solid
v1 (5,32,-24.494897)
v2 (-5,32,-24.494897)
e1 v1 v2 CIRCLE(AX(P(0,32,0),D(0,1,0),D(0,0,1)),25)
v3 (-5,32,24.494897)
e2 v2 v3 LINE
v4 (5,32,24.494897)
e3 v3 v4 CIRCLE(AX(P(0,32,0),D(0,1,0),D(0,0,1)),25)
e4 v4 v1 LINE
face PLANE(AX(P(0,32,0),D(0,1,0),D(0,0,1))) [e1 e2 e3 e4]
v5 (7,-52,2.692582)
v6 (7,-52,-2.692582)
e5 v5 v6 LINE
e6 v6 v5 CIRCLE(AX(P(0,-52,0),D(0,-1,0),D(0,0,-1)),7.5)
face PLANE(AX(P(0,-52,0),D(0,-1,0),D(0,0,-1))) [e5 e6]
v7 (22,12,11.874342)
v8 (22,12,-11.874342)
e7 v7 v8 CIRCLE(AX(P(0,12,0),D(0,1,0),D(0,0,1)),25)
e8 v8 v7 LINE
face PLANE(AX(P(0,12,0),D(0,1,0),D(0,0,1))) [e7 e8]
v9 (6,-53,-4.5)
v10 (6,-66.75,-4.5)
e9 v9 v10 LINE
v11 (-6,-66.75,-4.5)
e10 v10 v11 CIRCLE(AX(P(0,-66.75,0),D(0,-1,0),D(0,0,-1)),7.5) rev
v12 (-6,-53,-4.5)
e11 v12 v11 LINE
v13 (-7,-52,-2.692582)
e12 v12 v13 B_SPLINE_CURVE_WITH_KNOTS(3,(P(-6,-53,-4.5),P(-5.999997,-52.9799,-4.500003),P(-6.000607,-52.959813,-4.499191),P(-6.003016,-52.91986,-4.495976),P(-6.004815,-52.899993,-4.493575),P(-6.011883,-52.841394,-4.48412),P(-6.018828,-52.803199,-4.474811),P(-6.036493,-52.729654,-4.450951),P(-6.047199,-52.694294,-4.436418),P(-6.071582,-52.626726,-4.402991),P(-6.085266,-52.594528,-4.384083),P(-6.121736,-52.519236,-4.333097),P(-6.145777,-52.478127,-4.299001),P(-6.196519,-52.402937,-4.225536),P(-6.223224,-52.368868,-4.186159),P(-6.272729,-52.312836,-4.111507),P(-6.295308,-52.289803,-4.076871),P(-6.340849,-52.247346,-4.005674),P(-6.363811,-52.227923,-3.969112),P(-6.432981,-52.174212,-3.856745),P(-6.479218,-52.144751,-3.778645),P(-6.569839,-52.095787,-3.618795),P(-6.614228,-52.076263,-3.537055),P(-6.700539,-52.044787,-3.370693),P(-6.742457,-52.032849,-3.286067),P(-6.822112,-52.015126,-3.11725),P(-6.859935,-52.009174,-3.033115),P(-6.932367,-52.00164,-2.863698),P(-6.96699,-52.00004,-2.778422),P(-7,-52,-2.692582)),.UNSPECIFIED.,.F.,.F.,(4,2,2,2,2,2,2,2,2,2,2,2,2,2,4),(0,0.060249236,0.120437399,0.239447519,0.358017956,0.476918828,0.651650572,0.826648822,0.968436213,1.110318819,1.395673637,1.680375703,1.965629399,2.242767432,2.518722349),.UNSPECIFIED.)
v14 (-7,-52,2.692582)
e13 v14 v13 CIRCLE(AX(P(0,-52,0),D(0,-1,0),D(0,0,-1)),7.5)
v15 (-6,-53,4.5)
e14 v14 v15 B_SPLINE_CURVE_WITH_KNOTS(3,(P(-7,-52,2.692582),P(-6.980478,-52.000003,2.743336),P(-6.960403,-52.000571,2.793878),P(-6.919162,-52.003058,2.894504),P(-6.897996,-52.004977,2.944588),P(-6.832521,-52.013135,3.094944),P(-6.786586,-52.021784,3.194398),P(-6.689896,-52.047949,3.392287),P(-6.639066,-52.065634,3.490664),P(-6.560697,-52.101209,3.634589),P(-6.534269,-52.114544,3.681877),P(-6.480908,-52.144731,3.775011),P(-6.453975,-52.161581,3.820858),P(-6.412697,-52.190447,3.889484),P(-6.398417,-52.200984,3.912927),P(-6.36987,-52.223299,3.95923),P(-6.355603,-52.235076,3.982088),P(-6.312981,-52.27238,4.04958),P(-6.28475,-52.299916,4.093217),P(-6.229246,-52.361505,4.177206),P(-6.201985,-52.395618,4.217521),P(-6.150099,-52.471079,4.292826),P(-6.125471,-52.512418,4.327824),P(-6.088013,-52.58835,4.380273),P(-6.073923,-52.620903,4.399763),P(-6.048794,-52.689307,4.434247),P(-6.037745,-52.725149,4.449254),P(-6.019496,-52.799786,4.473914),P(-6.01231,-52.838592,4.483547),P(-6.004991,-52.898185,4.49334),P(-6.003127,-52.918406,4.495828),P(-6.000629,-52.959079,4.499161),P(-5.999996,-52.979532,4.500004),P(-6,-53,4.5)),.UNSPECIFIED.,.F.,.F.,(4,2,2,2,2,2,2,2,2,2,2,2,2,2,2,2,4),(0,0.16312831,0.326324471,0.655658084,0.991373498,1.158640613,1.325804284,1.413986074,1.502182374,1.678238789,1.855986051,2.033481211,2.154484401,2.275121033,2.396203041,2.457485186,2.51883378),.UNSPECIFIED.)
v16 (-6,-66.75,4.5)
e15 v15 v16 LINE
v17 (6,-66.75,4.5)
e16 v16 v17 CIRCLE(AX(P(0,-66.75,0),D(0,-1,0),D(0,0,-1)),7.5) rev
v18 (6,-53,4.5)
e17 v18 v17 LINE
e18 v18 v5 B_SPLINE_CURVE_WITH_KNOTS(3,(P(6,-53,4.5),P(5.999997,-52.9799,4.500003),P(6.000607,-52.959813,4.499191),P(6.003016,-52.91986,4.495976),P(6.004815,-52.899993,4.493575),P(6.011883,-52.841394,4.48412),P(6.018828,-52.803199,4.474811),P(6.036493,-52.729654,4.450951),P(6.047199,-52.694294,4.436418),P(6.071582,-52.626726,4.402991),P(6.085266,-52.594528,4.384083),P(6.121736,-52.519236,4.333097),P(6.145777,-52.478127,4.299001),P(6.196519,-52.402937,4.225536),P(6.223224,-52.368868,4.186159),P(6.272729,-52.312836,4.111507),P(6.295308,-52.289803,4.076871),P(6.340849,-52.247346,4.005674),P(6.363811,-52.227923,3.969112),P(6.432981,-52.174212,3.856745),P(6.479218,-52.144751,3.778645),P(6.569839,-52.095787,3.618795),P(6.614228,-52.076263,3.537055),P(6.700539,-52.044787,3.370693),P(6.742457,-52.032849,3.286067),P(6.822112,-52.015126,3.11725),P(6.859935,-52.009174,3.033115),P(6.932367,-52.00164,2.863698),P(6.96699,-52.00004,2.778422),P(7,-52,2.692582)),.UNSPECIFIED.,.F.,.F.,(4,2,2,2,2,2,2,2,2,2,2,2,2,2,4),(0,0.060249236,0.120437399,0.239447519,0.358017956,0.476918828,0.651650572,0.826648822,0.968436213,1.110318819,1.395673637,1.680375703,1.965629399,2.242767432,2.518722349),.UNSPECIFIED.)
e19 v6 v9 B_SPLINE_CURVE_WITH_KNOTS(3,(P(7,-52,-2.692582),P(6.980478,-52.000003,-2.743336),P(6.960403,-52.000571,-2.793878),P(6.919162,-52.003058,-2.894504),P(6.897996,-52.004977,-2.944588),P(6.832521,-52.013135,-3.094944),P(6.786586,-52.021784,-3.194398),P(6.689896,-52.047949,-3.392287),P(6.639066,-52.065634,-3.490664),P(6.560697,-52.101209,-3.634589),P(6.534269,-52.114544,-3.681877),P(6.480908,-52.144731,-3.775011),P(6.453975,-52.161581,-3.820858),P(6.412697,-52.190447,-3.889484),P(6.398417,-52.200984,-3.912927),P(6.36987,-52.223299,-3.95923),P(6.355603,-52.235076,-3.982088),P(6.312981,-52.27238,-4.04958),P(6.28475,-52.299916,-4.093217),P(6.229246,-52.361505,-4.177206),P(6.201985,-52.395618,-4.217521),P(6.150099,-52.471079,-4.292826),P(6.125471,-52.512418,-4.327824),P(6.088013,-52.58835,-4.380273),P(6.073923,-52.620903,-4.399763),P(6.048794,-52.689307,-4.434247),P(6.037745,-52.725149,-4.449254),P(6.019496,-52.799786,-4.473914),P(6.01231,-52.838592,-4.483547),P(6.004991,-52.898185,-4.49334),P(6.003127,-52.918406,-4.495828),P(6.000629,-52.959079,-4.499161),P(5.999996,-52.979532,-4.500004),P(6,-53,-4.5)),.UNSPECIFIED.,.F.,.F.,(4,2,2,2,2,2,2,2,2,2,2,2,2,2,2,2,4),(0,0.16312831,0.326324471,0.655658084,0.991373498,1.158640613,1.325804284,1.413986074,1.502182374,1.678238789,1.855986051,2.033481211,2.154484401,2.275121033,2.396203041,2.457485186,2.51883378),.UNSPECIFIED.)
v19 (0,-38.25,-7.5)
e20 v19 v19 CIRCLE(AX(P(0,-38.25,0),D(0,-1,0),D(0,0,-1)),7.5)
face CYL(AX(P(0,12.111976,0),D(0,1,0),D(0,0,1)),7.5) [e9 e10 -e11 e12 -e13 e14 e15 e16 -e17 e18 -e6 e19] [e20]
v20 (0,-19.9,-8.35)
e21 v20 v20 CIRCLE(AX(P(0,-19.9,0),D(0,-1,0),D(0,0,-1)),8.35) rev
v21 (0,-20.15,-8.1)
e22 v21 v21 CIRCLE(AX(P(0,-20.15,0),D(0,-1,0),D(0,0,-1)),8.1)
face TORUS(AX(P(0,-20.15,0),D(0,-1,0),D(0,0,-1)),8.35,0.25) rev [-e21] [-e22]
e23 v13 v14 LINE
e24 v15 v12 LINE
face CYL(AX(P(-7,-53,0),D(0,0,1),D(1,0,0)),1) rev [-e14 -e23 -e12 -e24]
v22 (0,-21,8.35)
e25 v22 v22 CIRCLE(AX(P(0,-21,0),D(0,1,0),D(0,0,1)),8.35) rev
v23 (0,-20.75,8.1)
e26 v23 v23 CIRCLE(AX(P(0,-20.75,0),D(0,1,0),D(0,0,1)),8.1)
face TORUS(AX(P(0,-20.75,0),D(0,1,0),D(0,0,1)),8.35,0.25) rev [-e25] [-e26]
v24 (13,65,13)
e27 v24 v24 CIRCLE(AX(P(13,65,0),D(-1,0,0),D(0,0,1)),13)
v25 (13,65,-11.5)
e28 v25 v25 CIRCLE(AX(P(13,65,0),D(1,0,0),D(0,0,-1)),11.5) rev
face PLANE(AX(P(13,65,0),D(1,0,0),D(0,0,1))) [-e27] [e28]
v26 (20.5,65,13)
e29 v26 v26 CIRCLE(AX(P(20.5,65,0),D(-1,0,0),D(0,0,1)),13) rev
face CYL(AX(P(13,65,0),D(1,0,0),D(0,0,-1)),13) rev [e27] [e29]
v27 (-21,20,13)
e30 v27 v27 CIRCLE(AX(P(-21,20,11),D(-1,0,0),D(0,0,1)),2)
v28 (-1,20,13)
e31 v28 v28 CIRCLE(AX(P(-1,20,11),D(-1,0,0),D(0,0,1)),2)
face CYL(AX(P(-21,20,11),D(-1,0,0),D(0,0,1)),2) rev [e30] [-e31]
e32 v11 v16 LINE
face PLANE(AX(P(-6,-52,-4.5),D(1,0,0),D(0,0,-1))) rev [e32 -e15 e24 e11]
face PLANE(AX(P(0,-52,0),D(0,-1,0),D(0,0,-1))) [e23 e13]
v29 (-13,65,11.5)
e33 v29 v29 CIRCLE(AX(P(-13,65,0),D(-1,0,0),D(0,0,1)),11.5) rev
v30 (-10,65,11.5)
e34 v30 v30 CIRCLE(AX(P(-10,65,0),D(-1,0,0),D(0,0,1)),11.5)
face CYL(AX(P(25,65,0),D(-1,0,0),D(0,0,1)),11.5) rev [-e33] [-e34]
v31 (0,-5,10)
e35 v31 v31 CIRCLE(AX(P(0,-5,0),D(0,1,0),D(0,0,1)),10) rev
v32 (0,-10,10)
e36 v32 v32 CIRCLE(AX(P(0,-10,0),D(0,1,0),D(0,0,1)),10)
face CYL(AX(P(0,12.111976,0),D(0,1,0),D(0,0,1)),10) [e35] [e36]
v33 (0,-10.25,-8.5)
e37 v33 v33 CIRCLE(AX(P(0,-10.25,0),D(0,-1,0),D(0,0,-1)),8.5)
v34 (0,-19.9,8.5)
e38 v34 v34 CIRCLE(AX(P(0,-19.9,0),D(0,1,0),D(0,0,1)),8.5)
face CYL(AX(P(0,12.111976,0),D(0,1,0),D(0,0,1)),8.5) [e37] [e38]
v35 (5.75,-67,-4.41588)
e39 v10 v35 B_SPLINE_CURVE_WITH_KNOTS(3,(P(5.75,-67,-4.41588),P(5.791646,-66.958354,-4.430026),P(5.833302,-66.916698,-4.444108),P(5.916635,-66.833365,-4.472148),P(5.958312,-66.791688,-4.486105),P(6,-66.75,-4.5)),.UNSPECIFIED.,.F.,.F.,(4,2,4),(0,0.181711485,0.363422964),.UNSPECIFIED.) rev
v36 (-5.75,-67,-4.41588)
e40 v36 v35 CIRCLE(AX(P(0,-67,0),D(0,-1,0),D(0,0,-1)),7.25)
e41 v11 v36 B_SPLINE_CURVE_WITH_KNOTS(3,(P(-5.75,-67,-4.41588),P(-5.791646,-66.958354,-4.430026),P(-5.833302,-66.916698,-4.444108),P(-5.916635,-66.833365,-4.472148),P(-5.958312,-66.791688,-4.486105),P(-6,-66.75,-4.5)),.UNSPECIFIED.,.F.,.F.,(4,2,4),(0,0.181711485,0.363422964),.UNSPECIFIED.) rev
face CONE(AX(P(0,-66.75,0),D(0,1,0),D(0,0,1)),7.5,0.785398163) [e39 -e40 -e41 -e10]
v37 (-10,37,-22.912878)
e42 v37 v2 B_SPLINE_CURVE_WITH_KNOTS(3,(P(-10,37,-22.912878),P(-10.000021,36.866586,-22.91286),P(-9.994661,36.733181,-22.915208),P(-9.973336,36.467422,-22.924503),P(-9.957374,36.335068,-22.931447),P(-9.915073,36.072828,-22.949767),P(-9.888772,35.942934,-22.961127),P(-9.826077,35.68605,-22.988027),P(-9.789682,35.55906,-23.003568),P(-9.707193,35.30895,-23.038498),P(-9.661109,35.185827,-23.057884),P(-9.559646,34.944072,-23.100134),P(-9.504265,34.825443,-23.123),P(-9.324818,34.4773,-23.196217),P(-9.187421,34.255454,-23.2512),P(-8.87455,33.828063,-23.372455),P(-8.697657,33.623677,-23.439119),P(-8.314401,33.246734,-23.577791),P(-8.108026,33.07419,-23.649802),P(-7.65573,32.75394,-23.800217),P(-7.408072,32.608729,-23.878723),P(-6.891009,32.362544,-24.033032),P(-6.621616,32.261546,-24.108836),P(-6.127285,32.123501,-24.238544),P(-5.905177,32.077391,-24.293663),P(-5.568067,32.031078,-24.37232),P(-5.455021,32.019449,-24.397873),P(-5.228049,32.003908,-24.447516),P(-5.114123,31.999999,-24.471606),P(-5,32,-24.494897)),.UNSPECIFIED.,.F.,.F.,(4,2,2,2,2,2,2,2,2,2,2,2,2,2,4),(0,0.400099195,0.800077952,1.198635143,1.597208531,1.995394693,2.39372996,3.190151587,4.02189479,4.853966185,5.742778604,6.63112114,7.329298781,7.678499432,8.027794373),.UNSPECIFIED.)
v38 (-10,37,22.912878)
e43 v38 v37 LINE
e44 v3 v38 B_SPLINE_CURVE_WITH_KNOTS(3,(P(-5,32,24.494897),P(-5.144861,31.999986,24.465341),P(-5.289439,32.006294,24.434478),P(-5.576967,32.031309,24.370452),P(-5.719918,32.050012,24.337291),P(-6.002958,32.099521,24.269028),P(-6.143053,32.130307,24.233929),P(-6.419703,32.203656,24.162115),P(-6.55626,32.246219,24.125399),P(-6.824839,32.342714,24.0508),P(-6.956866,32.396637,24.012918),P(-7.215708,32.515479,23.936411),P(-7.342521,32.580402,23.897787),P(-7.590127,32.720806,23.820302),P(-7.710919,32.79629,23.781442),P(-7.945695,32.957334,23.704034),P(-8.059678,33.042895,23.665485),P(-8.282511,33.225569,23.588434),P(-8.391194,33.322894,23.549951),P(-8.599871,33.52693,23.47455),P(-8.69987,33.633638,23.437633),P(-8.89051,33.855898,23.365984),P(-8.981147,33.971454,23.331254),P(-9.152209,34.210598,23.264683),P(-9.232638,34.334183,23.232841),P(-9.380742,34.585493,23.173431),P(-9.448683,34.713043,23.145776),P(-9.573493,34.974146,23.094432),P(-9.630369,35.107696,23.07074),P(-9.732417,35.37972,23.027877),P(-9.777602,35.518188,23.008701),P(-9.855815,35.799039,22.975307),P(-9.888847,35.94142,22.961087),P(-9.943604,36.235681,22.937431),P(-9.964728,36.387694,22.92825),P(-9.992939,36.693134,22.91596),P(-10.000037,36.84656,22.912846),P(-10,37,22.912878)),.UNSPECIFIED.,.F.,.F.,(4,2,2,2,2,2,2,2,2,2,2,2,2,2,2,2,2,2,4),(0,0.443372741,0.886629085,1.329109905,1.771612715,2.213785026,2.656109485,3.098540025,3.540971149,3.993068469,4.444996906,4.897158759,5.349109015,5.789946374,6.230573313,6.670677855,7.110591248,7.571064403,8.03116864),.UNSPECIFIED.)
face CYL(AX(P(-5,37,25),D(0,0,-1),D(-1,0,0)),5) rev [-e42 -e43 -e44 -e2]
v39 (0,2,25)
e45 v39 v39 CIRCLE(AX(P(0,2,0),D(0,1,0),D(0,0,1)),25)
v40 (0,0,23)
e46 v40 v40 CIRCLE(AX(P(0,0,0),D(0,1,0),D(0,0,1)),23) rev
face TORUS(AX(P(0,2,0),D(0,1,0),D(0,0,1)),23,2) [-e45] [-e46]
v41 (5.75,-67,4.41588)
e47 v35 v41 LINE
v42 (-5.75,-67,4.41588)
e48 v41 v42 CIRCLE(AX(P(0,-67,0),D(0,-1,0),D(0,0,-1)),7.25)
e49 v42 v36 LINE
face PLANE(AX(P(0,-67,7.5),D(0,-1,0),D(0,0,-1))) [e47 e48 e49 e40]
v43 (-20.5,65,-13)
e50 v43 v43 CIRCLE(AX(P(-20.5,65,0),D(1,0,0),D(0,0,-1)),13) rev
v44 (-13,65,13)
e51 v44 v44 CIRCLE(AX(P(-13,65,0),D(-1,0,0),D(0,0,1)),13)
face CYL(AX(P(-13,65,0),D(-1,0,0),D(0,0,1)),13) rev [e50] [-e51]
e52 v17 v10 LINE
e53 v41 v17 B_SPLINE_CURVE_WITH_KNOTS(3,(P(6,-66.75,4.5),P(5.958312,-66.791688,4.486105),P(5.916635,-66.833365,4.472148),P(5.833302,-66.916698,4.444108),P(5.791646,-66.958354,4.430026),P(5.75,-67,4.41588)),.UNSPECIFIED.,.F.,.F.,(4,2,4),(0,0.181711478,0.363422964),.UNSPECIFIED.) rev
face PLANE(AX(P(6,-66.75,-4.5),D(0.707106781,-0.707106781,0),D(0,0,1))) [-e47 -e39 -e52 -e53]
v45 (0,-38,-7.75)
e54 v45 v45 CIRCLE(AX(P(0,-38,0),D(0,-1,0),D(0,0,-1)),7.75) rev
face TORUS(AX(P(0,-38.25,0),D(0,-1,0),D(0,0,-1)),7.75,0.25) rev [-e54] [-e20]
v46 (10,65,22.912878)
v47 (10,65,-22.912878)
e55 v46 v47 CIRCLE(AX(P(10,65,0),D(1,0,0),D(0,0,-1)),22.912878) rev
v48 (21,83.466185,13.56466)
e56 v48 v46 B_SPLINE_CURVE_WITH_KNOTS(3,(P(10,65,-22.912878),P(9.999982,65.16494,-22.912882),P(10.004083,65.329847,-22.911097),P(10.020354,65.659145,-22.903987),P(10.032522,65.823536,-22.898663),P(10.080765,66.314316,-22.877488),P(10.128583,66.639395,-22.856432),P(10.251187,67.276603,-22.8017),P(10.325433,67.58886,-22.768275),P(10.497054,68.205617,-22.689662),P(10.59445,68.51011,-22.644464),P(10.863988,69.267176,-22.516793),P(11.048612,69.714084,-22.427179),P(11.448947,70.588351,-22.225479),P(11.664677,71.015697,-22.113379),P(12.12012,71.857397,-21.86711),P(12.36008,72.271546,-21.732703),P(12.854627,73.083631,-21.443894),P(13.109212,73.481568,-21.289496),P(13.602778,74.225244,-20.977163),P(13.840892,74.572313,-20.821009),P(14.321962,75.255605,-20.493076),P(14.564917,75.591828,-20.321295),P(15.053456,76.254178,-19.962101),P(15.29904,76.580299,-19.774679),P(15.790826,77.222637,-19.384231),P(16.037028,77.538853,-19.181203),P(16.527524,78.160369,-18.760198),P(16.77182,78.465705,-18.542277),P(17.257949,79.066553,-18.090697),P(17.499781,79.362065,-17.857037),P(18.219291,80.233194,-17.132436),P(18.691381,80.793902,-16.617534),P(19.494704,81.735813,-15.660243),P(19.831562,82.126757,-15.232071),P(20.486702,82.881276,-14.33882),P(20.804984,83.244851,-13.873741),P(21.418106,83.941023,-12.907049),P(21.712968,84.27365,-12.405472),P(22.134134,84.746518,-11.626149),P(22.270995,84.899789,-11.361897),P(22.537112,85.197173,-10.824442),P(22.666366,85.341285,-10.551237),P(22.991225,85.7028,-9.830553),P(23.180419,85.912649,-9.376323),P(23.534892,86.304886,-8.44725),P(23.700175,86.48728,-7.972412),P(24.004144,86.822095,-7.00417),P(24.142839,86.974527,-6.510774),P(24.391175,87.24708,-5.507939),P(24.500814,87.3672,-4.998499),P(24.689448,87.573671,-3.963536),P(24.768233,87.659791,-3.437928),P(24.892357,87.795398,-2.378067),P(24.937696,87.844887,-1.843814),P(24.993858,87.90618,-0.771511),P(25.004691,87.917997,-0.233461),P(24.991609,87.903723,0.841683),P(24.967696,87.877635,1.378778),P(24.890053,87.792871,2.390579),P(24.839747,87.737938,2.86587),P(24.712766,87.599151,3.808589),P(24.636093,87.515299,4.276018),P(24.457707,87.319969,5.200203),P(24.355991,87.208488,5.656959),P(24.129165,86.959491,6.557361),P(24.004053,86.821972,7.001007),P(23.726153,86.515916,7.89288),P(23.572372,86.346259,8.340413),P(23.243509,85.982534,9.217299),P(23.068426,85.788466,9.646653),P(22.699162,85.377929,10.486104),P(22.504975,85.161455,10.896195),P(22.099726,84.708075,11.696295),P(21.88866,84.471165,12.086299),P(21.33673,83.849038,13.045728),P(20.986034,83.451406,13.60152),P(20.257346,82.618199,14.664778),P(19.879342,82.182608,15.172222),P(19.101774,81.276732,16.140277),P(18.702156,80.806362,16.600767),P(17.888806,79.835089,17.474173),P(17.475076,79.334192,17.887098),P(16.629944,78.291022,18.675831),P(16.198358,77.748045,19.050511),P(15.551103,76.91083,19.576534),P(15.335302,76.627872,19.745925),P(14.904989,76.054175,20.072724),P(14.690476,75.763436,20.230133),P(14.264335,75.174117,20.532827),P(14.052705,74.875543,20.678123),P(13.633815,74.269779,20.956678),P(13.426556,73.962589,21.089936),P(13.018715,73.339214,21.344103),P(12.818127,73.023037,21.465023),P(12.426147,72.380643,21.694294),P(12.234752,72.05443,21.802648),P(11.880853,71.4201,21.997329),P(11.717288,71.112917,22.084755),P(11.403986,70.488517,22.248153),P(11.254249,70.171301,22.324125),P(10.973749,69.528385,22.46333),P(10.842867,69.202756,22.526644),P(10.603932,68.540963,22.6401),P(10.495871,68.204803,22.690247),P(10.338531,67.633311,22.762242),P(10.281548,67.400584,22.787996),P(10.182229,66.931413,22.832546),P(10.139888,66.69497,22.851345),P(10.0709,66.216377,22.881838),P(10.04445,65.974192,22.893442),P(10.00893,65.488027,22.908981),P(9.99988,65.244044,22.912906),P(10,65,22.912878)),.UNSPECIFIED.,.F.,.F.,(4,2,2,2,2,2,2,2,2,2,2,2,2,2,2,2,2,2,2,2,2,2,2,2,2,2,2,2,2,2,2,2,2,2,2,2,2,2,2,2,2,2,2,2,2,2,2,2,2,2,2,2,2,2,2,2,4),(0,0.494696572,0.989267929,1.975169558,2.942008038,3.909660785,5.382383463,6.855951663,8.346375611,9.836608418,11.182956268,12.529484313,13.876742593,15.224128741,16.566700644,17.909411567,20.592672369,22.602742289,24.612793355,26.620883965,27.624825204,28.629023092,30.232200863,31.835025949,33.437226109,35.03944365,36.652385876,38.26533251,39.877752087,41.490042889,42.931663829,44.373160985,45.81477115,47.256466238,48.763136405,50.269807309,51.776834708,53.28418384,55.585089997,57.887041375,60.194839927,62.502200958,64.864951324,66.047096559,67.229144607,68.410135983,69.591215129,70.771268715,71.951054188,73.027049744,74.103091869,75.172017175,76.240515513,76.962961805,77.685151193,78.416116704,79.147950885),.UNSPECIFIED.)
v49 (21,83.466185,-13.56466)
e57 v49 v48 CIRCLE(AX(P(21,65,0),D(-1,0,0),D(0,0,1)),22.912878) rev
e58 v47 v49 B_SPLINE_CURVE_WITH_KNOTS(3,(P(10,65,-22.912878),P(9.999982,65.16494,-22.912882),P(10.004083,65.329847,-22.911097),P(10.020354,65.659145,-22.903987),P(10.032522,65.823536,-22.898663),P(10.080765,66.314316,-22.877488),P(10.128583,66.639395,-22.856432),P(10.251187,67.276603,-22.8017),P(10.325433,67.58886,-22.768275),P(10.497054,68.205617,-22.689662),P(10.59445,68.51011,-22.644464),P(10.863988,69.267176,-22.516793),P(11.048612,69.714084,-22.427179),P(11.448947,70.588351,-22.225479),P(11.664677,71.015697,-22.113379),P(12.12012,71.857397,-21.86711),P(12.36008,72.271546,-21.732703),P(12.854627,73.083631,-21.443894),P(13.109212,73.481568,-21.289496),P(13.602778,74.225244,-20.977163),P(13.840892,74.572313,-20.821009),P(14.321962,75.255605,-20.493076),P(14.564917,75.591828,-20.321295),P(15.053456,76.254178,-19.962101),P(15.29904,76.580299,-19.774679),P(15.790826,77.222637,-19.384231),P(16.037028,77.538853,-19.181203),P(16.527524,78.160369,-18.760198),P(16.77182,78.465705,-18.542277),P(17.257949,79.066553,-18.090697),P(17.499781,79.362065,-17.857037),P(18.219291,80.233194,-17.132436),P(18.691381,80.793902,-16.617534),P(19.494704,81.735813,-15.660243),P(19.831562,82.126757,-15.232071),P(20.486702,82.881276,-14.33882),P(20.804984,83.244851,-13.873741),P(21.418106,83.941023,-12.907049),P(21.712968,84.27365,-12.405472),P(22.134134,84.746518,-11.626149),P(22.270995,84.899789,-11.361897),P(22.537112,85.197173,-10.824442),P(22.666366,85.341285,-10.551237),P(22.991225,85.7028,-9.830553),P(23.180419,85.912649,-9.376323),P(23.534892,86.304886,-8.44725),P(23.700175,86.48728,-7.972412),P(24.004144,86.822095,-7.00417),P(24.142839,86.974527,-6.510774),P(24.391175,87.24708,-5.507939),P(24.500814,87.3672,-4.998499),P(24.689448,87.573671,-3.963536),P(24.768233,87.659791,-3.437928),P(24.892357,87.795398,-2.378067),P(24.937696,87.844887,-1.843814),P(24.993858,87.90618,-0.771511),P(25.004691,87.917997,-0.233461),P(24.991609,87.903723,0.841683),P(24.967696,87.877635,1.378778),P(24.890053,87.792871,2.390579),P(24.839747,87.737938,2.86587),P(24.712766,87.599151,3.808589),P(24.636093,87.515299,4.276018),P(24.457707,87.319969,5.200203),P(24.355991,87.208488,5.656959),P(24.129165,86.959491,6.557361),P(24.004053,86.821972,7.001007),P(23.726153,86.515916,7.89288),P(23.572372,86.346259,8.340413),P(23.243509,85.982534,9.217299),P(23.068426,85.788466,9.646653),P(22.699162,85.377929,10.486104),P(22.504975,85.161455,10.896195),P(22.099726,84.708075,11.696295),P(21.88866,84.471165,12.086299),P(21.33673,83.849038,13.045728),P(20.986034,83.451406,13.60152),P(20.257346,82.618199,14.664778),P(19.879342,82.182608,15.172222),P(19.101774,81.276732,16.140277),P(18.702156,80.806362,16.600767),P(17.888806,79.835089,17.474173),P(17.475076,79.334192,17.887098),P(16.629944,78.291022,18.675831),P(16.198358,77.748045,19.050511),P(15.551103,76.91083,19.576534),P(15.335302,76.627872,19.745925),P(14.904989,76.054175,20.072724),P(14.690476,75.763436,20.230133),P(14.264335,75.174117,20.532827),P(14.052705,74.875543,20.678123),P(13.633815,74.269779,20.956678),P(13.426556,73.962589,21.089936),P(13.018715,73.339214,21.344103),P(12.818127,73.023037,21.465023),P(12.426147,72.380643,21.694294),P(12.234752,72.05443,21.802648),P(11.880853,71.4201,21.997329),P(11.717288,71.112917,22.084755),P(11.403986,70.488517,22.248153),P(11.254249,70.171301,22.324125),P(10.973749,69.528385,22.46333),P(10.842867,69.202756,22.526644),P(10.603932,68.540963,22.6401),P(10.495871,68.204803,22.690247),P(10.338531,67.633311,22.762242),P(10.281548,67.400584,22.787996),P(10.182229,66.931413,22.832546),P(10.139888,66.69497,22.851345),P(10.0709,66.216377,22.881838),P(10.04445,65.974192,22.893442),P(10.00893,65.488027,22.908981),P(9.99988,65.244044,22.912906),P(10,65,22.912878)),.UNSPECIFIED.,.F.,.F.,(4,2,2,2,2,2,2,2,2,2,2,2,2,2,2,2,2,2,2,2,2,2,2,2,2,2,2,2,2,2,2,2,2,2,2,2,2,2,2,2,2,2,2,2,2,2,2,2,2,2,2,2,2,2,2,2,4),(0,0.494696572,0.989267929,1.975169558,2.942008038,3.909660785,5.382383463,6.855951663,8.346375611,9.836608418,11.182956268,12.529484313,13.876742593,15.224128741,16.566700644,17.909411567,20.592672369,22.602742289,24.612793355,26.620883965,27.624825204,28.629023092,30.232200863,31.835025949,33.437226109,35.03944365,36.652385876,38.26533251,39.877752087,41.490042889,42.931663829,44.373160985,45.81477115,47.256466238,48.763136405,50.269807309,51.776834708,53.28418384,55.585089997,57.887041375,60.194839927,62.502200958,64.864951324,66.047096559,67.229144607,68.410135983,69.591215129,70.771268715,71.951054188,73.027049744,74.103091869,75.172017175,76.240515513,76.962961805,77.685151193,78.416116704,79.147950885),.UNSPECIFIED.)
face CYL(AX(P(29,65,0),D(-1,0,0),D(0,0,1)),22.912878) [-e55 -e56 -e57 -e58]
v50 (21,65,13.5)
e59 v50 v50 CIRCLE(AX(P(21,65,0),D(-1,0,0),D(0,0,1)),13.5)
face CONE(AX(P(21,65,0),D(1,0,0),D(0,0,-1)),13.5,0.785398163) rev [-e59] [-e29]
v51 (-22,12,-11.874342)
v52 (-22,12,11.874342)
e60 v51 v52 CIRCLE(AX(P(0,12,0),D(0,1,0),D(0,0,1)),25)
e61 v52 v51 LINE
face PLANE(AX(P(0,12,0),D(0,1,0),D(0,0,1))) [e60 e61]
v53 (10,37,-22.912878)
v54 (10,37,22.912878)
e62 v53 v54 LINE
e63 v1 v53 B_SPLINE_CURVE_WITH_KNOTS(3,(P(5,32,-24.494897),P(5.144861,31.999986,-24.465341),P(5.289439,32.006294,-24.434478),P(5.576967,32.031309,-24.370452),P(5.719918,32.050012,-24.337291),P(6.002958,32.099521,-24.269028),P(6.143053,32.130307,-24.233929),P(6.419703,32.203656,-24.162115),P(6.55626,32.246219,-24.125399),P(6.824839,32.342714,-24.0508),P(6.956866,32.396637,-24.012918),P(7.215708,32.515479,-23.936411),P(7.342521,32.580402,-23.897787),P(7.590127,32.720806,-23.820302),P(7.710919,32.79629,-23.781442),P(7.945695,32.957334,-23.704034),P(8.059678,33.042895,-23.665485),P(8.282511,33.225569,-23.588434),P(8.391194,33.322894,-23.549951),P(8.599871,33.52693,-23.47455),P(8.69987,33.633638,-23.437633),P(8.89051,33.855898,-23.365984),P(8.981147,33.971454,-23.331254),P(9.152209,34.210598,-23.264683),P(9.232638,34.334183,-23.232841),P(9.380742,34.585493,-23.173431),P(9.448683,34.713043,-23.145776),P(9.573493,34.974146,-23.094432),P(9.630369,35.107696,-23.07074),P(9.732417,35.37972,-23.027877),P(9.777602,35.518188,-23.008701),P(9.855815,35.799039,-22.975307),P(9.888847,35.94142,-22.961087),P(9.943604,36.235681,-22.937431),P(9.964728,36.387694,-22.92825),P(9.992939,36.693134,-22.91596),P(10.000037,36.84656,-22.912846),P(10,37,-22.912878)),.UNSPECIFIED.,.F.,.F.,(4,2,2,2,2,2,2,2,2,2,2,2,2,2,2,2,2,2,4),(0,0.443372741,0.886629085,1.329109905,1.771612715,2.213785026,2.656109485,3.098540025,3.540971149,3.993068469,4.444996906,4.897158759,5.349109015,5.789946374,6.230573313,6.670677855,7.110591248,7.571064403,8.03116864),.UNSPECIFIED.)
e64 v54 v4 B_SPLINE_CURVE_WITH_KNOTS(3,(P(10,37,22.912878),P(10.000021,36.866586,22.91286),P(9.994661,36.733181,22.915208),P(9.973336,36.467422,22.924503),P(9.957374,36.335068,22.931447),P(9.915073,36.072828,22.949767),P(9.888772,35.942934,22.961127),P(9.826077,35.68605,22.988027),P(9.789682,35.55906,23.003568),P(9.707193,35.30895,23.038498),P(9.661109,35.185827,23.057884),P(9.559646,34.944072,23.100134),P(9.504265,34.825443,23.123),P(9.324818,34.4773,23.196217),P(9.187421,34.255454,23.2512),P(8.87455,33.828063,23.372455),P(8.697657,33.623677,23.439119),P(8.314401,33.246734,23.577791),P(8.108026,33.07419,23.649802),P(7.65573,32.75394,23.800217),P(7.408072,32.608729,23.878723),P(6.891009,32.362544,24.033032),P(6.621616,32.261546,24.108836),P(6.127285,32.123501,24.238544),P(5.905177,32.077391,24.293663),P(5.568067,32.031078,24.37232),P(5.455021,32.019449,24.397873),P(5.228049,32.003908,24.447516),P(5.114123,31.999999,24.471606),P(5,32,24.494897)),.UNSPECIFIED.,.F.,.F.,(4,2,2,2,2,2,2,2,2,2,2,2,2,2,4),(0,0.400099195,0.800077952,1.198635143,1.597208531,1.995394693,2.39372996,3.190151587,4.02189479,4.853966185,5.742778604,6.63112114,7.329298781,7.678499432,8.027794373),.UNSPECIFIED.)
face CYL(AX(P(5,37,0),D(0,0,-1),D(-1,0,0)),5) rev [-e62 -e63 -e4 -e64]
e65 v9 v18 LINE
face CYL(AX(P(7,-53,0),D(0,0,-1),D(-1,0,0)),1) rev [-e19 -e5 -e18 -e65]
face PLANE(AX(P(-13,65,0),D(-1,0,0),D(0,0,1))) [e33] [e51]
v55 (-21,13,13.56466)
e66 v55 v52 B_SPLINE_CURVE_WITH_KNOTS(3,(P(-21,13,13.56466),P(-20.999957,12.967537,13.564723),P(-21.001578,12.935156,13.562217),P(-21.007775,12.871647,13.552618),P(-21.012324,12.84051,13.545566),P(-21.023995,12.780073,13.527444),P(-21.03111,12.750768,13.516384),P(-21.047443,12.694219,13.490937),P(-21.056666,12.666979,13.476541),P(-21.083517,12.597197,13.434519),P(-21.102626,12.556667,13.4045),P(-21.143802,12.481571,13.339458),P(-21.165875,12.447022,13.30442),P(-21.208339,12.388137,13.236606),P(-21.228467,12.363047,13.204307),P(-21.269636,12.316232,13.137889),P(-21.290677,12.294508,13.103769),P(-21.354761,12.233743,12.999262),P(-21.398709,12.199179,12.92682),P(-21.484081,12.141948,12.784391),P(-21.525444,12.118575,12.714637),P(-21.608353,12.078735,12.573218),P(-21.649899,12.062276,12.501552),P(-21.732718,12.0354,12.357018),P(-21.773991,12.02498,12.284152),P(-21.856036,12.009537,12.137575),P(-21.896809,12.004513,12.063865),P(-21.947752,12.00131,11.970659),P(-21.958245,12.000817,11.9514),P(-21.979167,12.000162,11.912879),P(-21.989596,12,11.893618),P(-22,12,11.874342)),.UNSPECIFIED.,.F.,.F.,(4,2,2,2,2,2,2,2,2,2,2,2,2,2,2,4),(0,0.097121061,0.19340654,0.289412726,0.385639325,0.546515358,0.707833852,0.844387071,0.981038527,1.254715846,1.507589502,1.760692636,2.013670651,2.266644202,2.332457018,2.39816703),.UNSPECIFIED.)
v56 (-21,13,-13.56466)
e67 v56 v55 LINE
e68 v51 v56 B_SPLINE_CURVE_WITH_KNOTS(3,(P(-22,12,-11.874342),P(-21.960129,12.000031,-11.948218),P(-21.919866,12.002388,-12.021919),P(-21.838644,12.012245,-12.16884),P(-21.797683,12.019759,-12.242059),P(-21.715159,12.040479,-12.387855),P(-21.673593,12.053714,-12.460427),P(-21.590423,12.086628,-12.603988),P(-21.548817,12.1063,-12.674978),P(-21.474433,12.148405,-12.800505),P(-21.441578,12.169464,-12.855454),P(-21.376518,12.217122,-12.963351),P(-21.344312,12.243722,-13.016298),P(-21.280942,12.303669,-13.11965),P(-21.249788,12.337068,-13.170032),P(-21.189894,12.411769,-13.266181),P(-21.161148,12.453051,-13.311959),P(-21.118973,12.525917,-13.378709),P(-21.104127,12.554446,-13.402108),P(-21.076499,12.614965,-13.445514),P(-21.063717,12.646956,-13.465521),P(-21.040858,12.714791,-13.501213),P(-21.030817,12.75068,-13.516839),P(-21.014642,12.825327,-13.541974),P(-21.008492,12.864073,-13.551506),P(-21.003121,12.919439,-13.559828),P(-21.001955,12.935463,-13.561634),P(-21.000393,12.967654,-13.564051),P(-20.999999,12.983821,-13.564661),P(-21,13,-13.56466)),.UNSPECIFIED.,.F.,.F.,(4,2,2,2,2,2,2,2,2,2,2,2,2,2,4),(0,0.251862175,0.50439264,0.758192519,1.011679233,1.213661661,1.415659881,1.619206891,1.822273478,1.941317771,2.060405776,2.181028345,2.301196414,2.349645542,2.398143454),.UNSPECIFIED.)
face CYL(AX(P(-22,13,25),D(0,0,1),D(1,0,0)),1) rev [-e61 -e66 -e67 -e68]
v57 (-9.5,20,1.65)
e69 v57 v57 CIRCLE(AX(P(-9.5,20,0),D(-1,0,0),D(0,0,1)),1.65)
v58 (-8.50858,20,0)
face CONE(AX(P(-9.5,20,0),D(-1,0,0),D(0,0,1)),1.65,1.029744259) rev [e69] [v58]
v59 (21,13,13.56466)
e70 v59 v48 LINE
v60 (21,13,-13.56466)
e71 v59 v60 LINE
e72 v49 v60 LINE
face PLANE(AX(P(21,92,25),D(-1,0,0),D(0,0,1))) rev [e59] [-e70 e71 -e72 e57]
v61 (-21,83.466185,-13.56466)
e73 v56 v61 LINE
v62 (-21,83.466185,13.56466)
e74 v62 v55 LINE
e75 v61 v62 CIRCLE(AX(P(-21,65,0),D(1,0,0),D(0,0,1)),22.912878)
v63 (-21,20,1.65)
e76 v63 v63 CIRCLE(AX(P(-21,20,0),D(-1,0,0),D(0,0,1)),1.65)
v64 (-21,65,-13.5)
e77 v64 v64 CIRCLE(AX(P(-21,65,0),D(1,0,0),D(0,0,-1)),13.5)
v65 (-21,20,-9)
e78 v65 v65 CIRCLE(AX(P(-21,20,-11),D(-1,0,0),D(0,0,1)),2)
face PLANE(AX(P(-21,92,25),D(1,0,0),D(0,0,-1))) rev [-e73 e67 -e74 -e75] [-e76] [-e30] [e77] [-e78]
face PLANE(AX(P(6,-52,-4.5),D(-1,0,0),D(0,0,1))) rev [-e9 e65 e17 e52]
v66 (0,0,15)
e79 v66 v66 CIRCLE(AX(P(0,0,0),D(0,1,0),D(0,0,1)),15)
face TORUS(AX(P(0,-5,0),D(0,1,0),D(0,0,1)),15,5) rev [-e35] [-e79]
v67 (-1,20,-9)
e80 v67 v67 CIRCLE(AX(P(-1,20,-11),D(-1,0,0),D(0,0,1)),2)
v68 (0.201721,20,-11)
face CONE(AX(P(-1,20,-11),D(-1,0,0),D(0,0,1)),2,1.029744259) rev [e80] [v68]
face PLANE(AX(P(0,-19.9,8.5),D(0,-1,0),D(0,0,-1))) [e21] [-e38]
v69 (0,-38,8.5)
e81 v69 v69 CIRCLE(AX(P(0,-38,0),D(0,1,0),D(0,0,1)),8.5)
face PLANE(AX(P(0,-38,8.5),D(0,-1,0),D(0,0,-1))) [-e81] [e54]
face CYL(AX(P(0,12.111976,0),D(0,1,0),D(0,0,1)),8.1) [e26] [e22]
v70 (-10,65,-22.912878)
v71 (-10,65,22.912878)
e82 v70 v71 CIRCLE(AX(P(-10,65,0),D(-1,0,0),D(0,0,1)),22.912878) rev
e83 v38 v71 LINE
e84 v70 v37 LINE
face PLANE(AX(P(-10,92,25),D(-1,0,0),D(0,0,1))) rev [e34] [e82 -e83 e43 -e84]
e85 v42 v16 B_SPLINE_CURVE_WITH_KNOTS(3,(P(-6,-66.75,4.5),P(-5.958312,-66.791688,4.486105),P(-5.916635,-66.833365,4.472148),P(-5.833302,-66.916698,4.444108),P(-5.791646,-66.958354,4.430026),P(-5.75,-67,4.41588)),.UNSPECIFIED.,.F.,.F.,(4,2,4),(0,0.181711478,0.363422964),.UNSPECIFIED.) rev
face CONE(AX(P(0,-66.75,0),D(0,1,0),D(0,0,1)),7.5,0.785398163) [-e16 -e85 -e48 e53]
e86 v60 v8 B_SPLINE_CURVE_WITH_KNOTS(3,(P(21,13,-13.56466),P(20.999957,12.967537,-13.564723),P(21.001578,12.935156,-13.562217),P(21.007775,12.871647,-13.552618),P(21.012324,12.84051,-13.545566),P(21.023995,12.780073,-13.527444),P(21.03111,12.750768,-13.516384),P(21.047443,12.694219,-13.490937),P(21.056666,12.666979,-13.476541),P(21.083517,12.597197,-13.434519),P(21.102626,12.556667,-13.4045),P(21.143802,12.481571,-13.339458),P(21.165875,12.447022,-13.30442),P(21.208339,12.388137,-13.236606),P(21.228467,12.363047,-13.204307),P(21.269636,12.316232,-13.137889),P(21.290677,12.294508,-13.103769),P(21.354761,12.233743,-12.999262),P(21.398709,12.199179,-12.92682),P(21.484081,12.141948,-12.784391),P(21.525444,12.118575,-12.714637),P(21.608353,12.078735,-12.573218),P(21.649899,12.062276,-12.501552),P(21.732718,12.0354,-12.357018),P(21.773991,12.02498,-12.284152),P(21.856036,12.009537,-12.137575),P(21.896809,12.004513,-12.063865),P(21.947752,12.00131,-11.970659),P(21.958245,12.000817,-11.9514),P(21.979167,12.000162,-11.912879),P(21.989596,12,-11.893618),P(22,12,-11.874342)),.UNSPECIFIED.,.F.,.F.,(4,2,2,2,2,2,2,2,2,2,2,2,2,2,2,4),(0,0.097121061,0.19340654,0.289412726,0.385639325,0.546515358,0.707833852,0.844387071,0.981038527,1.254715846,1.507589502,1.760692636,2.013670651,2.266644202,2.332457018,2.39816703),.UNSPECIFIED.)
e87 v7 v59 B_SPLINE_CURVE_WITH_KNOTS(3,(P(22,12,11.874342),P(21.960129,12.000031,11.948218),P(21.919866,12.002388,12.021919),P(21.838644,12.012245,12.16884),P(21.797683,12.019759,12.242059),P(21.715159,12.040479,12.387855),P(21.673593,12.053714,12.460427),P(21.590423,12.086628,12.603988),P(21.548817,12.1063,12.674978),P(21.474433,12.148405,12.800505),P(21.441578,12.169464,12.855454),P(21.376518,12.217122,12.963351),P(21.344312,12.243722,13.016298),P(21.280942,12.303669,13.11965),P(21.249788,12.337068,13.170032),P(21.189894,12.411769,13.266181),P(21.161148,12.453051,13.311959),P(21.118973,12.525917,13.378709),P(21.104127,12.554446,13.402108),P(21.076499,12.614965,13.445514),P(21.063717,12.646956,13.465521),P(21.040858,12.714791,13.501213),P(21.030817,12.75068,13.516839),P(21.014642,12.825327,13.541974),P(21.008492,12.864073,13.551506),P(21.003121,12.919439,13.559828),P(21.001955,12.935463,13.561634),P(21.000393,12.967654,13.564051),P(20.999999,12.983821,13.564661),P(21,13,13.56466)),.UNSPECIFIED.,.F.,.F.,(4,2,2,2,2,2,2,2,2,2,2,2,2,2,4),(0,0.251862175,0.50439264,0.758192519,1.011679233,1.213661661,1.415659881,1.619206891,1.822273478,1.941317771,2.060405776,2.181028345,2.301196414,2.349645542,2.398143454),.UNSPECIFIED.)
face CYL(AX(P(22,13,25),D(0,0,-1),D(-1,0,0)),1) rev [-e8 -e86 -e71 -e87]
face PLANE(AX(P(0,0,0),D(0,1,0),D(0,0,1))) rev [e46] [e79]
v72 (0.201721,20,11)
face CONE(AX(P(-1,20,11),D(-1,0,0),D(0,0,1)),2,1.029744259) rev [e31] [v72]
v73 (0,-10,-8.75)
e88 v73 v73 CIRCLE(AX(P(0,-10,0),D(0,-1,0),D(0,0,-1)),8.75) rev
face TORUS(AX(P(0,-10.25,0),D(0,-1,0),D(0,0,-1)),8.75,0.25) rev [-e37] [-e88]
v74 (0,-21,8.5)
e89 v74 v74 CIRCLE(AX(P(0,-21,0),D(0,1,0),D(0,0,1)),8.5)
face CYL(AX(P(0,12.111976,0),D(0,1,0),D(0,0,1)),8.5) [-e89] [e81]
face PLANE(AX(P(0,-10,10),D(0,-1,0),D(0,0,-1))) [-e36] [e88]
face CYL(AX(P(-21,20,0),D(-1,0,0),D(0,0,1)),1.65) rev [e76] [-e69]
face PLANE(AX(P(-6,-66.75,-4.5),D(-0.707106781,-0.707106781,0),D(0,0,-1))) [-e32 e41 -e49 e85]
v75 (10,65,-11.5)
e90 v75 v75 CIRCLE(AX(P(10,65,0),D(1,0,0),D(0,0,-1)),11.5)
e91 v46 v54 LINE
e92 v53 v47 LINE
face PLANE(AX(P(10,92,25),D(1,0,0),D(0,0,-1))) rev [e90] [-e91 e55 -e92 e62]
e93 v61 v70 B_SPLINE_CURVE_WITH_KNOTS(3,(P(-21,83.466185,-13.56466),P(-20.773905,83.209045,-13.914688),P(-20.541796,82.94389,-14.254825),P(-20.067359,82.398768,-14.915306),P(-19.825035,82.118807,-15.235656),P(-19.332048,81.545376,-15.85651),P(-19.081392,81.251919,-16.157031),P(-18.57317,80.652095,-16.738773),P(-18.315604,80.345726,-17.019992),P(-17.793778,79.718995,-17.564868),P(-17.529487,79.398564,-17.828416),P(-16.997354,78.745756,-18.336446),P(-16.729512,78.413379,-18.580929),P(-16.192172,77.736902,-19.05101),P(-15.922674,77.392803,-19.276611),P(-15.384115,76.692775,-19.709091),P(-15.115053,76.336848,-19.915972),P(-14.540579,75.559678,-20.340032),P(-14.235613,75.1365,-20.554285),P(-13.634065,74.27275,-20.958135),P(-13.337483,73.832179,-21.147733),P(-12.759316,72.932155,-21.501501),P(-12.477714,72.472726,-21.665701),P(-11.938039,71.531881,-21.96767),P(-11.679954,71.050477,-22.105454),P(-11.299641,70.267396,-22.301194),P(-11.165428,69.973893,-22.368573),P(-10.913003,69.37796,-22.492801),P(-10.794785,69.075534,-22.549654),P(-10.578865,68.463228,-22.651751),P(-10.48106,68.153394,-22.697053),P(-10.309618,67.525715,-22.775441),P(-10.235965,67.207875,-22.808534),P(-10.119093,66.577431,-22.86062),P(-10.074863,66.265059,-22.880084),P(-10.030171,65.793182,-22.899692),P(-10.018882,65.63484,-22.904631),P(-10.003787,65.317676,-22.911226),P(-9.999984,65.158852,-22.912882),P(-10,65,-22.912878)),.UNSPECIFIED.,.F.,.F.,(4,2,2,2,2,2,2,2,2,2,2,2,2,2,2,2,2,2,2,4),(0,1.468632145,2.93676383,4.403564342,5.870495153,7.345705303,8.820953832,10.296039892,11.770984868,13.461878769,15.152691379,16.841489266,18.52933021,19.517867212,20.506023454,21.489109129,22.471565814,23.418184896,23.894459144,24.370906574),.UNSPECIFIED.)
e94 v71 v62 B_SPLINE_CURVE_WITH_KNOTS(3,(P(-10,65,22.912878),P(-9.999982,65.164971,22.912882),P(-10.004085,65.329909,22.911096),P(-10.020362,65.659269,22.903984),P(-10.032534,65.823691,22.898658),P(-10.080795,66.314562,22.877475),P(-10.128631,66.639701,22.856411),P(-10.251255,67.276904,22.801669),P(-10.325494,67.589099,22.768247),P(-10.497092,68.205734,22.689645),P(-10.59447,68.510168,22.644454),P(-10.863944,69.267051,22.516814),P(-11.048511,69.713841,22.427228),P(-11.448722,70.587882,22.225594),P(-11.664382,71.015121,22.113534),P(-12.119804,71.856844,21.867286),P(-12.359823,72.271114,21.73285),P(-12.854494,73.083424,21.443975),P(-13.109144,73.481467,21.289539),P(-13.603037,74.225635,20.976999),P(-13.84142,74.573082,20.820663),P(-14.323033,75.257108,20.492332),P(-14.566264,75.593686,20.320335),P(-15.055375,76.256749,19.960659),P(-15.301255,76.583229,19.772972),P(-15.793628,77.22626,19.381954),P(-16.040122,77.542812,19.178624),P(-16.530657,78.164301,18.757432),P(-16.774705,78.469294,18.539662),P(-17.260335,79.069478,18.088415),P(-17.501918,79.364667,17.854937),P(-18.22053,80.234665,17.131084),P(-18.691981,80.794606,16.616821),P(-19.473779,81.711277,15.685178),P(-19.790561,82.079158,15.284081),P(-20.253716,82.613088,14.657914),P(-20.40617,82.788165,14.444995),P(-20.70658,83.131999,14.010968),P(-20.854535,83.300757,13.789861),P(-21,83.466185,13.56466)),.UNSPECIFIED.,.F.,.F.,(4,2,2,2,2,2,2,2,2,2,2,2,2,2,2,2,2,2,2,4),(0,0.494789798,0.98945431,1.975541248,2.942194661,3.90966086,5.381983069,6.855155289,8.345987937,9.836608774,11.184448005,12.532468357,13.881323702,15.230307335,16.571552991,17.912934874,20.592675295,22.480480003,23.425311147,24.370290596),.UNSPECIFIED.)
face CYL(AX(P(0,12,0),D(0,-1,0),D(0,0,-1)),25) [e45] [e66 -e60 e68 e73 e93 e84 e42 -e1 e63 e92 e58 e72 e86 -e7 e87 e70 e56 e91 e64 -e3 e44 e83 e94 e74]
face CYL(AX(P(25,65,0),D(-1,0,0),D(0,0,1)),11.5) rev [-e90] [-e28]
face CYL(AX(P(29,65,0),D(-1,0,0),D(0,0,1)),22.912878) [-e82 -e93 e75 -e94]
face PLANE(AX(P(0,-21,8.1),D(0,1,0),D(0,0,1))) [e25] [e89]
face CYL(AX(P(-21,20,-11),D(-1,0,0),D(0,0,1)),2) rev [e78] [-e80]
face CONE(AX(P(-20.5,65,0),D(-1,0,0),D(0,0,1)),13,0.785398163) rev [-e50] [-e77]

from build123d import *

# Parameters (mm, degrees)
BOSS_EXTRUDE1_DEPTH       = 12
BOSS_EXTRUDE2_DEPTH       = 80
FILLET1_R                 = 10
CUT_EXTRUDE5_DEPTH        = 99.55962662266938
CUT_EXTRUDE5_DEPTH_BACK   = 99.55962662266938
SKETCH9_R                 = 35.52790528146086
SKETCH9_R_2               = 25
CUT_EXTRUDE1_DEPTH        = 50
BOSS_EXTRUDE3_DEPTH       = 20
SKETCH8_R                 = 1.0000000000000018
SKETCH8_R_2               = 1.0000000000000002
CUT_EXTRUDE4_DEPTH        = 5
FILLET5_R                 = 1
FILLET6_R                 = 5
SKETCH10_R                = 11.499999999999998
CUT_EXTRUDE6_DEPTH        = 103.32142607246962
SKETCH11_R                = 13.000000000000002
CUT_EXTRUDE7_DEPTH        = 8
FILLET8_R                 = 0.25
CUT_EXTRUDE8_START        = -15
CUT_EXTRUDE8_DEPTH        = 15
FILLET9_R                 = 1
FILLET10_R                = 5
CHAMFER1_SIZE             = 0.25
F_4_0MM_DOWEL_HOLE1_D     = 4
F_4_0MM_DOWEL_HOLE1_DEPTH = 20
F_4_0MM_DOWEL_HOLE1_TIP   = 1.2017212380551205
M4X0_7_TAPPED_HOLE1_D     = 3.3
M4X0_7_TAPPED_HOLE1_DEPTH = 11.5
M4X0_7_TAPPED_HOLE1_TIP   = 0.9914200213954745
CHAMFER2_SIZE             = 0.5


with BuildPart() as part:
    # Sketch1 → Boss-Extrude1 (new body)
    with BuildSketch(Plane(origin=(0, 0, 0), x_dir=(1, 0, 0), z_dir=(0, 1, 0))):
        with BuildLine():
            ThreePointArc((17.083333333333336, 18.252663428174593), (-25.000000000000004, 3.06e-15), (17.083333333333336, -18.252663428174593))
            ThreePointArc((17.083333333333336, -18.252663428174593), (25.000000000000004, 0), (17.083333333333336, 18.252663428174593))
        make_face()
    extrude(amount=BOSS_EXTRUDE1_DEPTH)

    # Sketch2 → Boss-Extrude2 (add)
    with BuildSketch(Plane(origin=(0, 12, 0), x_dir=(1, 0, 0), z_dir=(0, 1, 0))):
        Polygon((-21, -25), (-10.000000000000004, -25), (-9.99999999999999, 25), (-21, 24.999999999999993), align=None)
        Polygon((9.999999999999995, -25.000000000000007), (20.999999999999993, -25.000000000000007), (20.999999999999993, 24.999999999999993), (9.999999999999998, 24.999999999999993), align=None)
    extrude(amount=BOSS_EXTRUDE2_DEPTH)

    # Fillet1
    fillet1_edges = [part.edges().sort_by_distance(p)[0] for p in [
        (-15.499999999999995, 92, -24.999999999999996),
        (-15.500000000000002, 92, 25),
        (15.499999999999996, 92, -24.999999999999993),
        (15.499999999999993, 92, 25.000000000000007),
    ]]
    fillet(fillet1_edges, radius=FILLET1_R)

    # Sketch9 → Cut-Extrude5 (cut, two sides: drawn at the far end of the back side and taken through both)
    with BuildSketch(Plane(origin=(0, 0, 0), x_dir=(1, 0, 0), z_dir=(0, 1, 0)).offset(-CUT_EXTRUDE5_DEPTH_BACK)):
        Circle(SKETCH9_R)
        with Locations(Location((0, 0, 0), (0, 0, 113.578178478))):
            Circle(SKETCH9_R_2, mode=Mode.SUBTRACT)
    extrude(amount=CUT_EXTRUDE5_DEPTH + CUT_EXTRUDE5_DEPTH_BACK, mode=Mode.SUBTRACT)

    # Sketch4 → Cut-Extrude1 (cut)
    with BuildSketch(Plane.ZY.offset(21)):
        with BuildLine():
            Line((-22.912878474779195, 65), (-31.15503377709483, 65))
            Line((-31.15503377709483, 65), (-31.15503377709483, 113.2535674059588))
            Line((-31.15503377709483, 113.2535674059588), (29.53442081259816, 113.2535674059588))
            Line((29.53442081259816, 113.2535674059588), (29.534420812598167, 65.00000000000001))
            Line((29.534420812598167, 65.00000000000001), (22.912878474779195, 65))
            ThreePointArc((22.912878474779195, 65), (1.4e-15, 87.91287847477919), (-22.912878474779195, 65))
        make_face()
    extrude(amount=-CUT_EXTRUDE1_DEPTH, mode=Mode.SUBTRACT)

    # Sketch6 → Boss-Extrude3 (add)
    with BuildSketch(Plane(origin=(0, 12, 0), x_dir=(1, 0, 0), z_dir=(0, 1, 0))):
        with BuildLine():
            Line((9.999999999999998, -22.9128784747792), (9.999999999999998, 22.9128784747792))
            ThreePointArc((9.999999999999998, 22.9128784747792), (1.53e-15, 24.999999999999996), (-9.999999999999995, 22.9128784747792))
            Line((-9.999999999999995, 22.9128784747792), (-9.999999999999995, -22.9128784747792))
            ThreePointArc((-9.999999999999995, -22.9128784747792), (1.53e-15, -24.999999999999996), (9.999999999999998, -22.9128784747792))
        make_face()
    extrude(amount=BOSS_EXTRUDE3_DEPTH)

    # Sketch8 → Cut-Extrude4 (cut)
    with BuildSketch(Plane.ZY.offset(21)):
        with Locations((-10.999999999999996, 20)):
            Circle(SKETCH8_R)
        with Locations((0, 19.999999999999996)):
            Circle(SKETCH8_R_2)
        with Locations((11, 19.999999999999996)):
            Circle(SKETCH8_R)
    extrude(amount=-CUT_EXTRUDE4_DEPTH, mode=Mode.SUBTRACT)

    # Fillet5
    # the kernel refuses this fillet: 1 mm, written as the material it adds along each edge
    with BuildSketch(Plane(origin=(-21, 12, -16.064659966249277), x_dir=(0, 1, 0), z_dir=(0, 0, 1))) as fillet5_piece_1_section:
        with BuildLine():
            CenterArc((FILLET5_R, FILLET5_R), FILLET5_R, 180, 90)
            Line((0, FILLET5_R), (0, 0))
            Line((0, 0), (FILLET5_R, 0))
        make_face()
    fillet5_piece_1 = extrude(amount=32.12931993250112, mode=Mode.PRIVATE)
    fillet5_piece_1 = fillet5_piece_1 & Plane(origin=(0, 12, 0), x_dir=(-0.3999999999967713, 0, -0.9165151389925771), z_dir=(0, -1, 0)) * Cylinder(25, 69, mode=Mode.PRIVATE)
    add(fillet5_piece_1)
    with BuildSketch(Plane(origin=(20.999999999999993, 12, 16.064659966250236), x_dir=(0, 1, 0), z_dir=(0, 0, -1))) as fillet5_piece_2_section:
        with BuildLine():
            CenterArc((FILLET5_R, FILLET5_R), FILLET5_R, 180, 90)
            Line((0, FILLET5_R), (0, 0))
            Line((0, 0), (FILLET5_R, 0))
        make_face()
    fillet5_piece_2 = extrude(amount=32.12931993250051, mode=Mode.PRIVATE)
    fillet5_piece_2 = fillet5_piece_2 & Plane(origin=(0, 12, 0), x_dir=(-0.3999999999967713, 0, -0.9165151389925771), z_dir=(0, -1, 0)) * Cylinder(25, 69, mode=Mode.PRIVATE)
    add(fillet5_piece_2)

    # Fillet6
    # the kernel refuses this fillet: 5 mm, written as the material it adds along each edge
    with BuildSketch(Plane(origin=(-9.999999999999995, 32, -35.4128784747792), x_dir=(1, 0, 0), z_dir=(0, 0, 1))) as fillet6_piece_1_section:
        with BuildLine():
            CenterArc((FILLET6_R, FILLET6_R), FILLET6_R, 180, 90)
            Line((-1.78e-15, FILLET6_R), (0, 0))
            Line((0, 0), (FILLET6_R, 0))
        make_face()
    fillet6_piece_1 = extrude(amount=70.8257569495584, mode=Mode.PRIVATE)
    fillet6_piece_1 = fillet6_piece_1 & Plane(origin=(0, 32, 0), x_dir=(-0.3999999999967713, 0, -0.9165151389925771), z_dir=(0, -1, 0)) * Cylinder(25, 162, mode=Mode.PRIVATE)
    add(fillet6_piece_1)
    with BuildSketch(Plane(origin=(9.999999999999998, 32, 35.4128784747792), x_dir=(-3.6e-16, 1, 0), z_dir=(0, 0, -1))) as fillet6_piece_2_section:
        with BuildLine():
            CenterArc((FILLET6_R, -FILLET6_R), FILLET6_R, 90.00000000000003, 89.99999999999997)
            Line((1.78e-15, -FILLET6_R), (0, 0))
            Line((0, 0), (FILLET6_R, 0))
        make_face()
    fillet6_piece_2 = extrude(amount=70.8257569495584, mode=Mode.PRIVATE)
    fillet6_piece_2 = fillet6_piece_2 & Plane(origin=(0, 32, 0), x_dir=(-0.3999999999967713, 0, -0.9165151389925771), z_dir=(0, -1, 0)) * Cylinder(25, 162, mode=Mode.PRIVATE)
    add(fillet6_piece_2)

    # Sketch10 → Cut-Extrude6 (cut, through all)
    with BuildSketch(Plane.ZY.offset(21)):
        with Locations((0, 65)):
            Circle(SKETCH10_R)
    extrude(amount=-CUT_EXTRUDE6_DEPTH, mode=Mode.SUBTRACT)

    # Sketch11 → Cut-Extrude7 (cut)
    with BuildSketch(Plane.ZY.offset(21)):
        with Locations((0, 65)):
            Circle(SKETCH11_R)
    cut_extrude7 = extrude(amount=-CUT_EXTRUDE7_DEPTH, mode=Mode.SUBTRACT)

    # Mirror1: Cut-Extrude7 across plane
    add(cut_extrude7.mirror(Plane(origin=(0, 0, 0), x_dir=(0, 0, 1), z_dir=(1, 0, 0))), mode=Mode.SUBTRACT)

    # Sketch12 → Revolve1 (revolve)
    with BuildSketch(Plane(origin=(0, 0, 0), x_dir=(0, 0, -1), z_dir=(1, 0, 0))):
        Polygon((-9.999999999999995, 0), (0, 0), (9.54e-15, -67), (-7.49999999999999, -67), (-7.499999999999994, -38), (-8.499999999999998, -38), (-8.499999999999998, -20.999999999999996), (-8.1, -20.999999999999996), (-8.099999999999998, -19.9), (-8.499999999999998, -19.900000000000002), (-8.5, -10), (-10.000000000000002, -10), align=None)
    revolve(axis=Axis((0, 12.111975574510412, 0), (0, -1, 0)))

    # Fillet7: read off the stored shape, not the designer's step
    # Fillet7 outline → Fillet7 (revolve, cut)
    with BuildSketch(Plane.XY):
        with BuildLine():
            ThreePointArc((25, 2), (24.414213562, 0.585786438), (23, 0))
            Line((23, 0), (25, 0))
            Line((25, 0), (25, 2))
        make_face()
    revolve(axis=Axis((0, 0, 0), (0, 1, 0)), mode=Mode.SUBTRACT)

    # Fillet8
    fillet8_edges = [part.edges().sort_by_distance(p)[0] for p in [
        (-9.9e-16, -19.9, -8.099999999999998),
        (-1.04e-15, -9.999999999999998, -8.5),
        (-9.2e-16, -38, -7.499999999999994),
        (-9.9e-16, -21, -8.1),
    ]]
    fillet(fillet8_edges, radius=FILLET8_R)

    # Sketch13 → Cut-Extrude8 (cut)
    with BuildSketch(Plane.XZ.offset(67).offset(CUT_EXTRUDE8_START)):
        with BuildLine():
            Line((-6, -4.500000000000001), (-6, 4.500000000000001))
            ThreePointArc((-6, 4.500000000000001), (-7.500000000000001, 9.2e-16), (-6, -4.500000000000001))
        make_face()
        with BuildLine():
            Line((6, -4.500000000000001), (6, 4.500000000000001))
            ThreePointArc((6, 4.500000000000001), (7.500000000000001, 0), (6, -4.500000000000001))
        make_face()
    extrude(amount=CUT_EXTRUDE8_DEPTH, mode=Mode.SUBTRACT)

    # Fillet9
    fillet9_edges = [part.edges().sort_by_distance(p)[0] for p in [
        (6, -52, 0),
        (-6, -52, 0),
    ]]
    fillet(fillet9_edges, radius=FILLET9_R)

    # Fillet10
    fillet10_edges = [part.edges().sort_by_distance(p)[0] for p in [
        (-1.22e-15, 0, -9.999999999999995),
    ]]
    fillet(fillet10_edges, radius=FILLET10_R)

    # Chamfer1
    chamfer1_edges = [part.edges().sort_by_distance(p)[0] for p in [
        (-9.2e-16, -67, -7.49999999999999),
        (3.354101966249682, -67, 6.70820393249936),
        (6, -67, 0),
        (-6, -67, 0),
    ]]
    chamfer(chamfer1_edges, length=CHAMFER1_SIZE)

    # Ø4.0mm Dowel Hole1
    with Locations(Plane.ZY.offset(21)):
        with Locations((-11, 20), (11, 20)):
            Hole(F_4_0MM_DOWEL_HOLE1_D / 2, depth=F_4_0MM_DOWEL_HOLE1_DEPTH)
            with Locations((0, 0, -(F_4_0MM_DOWEL_HOLE1_DEPTH + F_4_0MM_DOWEL_HOLE1_TIP / 2))):  # 118° drill point
                Cone(0, F_4_0MM_DOWEL_HOLE1_D / 2, F_4_0MM_DOWEL_HOLE1_TIP, mode=Mode.SUBTRACT)

    # M4x0.7 Tapped Hole1
    with Locations(Plane.ZY.offset(21)):
        with Locations((0, 20)):
            Hole(M4X0_7_TAPPED_HOLE1_D / 2, depth=M4X0_7_TAPPED_HOLE1_DEPTH)
            with Locations((0, 0, -(M4X0_7_TAPPED_HOLE1_DEPTH + M4X0_7_TAPPED_HOLE1_TIP / 2))):  # 118° drill point
                Cone(0, M4X0_7_TAPPED_HOLE1_D / 2, M4X0_7_TAPPED_HOLE1_TIP, mode=Mode.SUBTRACT)

    # Chamfer2
    chamfer2_edges = [part.edges().sort_by_distance(p)[0] for p in [
        (-21, 65, -13.000000000000002),
        (21, 65, -13.000000000000002),
    ]]
    chamfer(chamfer2_edges, length=CHAMFER2_SIZE)


solid = part.part
